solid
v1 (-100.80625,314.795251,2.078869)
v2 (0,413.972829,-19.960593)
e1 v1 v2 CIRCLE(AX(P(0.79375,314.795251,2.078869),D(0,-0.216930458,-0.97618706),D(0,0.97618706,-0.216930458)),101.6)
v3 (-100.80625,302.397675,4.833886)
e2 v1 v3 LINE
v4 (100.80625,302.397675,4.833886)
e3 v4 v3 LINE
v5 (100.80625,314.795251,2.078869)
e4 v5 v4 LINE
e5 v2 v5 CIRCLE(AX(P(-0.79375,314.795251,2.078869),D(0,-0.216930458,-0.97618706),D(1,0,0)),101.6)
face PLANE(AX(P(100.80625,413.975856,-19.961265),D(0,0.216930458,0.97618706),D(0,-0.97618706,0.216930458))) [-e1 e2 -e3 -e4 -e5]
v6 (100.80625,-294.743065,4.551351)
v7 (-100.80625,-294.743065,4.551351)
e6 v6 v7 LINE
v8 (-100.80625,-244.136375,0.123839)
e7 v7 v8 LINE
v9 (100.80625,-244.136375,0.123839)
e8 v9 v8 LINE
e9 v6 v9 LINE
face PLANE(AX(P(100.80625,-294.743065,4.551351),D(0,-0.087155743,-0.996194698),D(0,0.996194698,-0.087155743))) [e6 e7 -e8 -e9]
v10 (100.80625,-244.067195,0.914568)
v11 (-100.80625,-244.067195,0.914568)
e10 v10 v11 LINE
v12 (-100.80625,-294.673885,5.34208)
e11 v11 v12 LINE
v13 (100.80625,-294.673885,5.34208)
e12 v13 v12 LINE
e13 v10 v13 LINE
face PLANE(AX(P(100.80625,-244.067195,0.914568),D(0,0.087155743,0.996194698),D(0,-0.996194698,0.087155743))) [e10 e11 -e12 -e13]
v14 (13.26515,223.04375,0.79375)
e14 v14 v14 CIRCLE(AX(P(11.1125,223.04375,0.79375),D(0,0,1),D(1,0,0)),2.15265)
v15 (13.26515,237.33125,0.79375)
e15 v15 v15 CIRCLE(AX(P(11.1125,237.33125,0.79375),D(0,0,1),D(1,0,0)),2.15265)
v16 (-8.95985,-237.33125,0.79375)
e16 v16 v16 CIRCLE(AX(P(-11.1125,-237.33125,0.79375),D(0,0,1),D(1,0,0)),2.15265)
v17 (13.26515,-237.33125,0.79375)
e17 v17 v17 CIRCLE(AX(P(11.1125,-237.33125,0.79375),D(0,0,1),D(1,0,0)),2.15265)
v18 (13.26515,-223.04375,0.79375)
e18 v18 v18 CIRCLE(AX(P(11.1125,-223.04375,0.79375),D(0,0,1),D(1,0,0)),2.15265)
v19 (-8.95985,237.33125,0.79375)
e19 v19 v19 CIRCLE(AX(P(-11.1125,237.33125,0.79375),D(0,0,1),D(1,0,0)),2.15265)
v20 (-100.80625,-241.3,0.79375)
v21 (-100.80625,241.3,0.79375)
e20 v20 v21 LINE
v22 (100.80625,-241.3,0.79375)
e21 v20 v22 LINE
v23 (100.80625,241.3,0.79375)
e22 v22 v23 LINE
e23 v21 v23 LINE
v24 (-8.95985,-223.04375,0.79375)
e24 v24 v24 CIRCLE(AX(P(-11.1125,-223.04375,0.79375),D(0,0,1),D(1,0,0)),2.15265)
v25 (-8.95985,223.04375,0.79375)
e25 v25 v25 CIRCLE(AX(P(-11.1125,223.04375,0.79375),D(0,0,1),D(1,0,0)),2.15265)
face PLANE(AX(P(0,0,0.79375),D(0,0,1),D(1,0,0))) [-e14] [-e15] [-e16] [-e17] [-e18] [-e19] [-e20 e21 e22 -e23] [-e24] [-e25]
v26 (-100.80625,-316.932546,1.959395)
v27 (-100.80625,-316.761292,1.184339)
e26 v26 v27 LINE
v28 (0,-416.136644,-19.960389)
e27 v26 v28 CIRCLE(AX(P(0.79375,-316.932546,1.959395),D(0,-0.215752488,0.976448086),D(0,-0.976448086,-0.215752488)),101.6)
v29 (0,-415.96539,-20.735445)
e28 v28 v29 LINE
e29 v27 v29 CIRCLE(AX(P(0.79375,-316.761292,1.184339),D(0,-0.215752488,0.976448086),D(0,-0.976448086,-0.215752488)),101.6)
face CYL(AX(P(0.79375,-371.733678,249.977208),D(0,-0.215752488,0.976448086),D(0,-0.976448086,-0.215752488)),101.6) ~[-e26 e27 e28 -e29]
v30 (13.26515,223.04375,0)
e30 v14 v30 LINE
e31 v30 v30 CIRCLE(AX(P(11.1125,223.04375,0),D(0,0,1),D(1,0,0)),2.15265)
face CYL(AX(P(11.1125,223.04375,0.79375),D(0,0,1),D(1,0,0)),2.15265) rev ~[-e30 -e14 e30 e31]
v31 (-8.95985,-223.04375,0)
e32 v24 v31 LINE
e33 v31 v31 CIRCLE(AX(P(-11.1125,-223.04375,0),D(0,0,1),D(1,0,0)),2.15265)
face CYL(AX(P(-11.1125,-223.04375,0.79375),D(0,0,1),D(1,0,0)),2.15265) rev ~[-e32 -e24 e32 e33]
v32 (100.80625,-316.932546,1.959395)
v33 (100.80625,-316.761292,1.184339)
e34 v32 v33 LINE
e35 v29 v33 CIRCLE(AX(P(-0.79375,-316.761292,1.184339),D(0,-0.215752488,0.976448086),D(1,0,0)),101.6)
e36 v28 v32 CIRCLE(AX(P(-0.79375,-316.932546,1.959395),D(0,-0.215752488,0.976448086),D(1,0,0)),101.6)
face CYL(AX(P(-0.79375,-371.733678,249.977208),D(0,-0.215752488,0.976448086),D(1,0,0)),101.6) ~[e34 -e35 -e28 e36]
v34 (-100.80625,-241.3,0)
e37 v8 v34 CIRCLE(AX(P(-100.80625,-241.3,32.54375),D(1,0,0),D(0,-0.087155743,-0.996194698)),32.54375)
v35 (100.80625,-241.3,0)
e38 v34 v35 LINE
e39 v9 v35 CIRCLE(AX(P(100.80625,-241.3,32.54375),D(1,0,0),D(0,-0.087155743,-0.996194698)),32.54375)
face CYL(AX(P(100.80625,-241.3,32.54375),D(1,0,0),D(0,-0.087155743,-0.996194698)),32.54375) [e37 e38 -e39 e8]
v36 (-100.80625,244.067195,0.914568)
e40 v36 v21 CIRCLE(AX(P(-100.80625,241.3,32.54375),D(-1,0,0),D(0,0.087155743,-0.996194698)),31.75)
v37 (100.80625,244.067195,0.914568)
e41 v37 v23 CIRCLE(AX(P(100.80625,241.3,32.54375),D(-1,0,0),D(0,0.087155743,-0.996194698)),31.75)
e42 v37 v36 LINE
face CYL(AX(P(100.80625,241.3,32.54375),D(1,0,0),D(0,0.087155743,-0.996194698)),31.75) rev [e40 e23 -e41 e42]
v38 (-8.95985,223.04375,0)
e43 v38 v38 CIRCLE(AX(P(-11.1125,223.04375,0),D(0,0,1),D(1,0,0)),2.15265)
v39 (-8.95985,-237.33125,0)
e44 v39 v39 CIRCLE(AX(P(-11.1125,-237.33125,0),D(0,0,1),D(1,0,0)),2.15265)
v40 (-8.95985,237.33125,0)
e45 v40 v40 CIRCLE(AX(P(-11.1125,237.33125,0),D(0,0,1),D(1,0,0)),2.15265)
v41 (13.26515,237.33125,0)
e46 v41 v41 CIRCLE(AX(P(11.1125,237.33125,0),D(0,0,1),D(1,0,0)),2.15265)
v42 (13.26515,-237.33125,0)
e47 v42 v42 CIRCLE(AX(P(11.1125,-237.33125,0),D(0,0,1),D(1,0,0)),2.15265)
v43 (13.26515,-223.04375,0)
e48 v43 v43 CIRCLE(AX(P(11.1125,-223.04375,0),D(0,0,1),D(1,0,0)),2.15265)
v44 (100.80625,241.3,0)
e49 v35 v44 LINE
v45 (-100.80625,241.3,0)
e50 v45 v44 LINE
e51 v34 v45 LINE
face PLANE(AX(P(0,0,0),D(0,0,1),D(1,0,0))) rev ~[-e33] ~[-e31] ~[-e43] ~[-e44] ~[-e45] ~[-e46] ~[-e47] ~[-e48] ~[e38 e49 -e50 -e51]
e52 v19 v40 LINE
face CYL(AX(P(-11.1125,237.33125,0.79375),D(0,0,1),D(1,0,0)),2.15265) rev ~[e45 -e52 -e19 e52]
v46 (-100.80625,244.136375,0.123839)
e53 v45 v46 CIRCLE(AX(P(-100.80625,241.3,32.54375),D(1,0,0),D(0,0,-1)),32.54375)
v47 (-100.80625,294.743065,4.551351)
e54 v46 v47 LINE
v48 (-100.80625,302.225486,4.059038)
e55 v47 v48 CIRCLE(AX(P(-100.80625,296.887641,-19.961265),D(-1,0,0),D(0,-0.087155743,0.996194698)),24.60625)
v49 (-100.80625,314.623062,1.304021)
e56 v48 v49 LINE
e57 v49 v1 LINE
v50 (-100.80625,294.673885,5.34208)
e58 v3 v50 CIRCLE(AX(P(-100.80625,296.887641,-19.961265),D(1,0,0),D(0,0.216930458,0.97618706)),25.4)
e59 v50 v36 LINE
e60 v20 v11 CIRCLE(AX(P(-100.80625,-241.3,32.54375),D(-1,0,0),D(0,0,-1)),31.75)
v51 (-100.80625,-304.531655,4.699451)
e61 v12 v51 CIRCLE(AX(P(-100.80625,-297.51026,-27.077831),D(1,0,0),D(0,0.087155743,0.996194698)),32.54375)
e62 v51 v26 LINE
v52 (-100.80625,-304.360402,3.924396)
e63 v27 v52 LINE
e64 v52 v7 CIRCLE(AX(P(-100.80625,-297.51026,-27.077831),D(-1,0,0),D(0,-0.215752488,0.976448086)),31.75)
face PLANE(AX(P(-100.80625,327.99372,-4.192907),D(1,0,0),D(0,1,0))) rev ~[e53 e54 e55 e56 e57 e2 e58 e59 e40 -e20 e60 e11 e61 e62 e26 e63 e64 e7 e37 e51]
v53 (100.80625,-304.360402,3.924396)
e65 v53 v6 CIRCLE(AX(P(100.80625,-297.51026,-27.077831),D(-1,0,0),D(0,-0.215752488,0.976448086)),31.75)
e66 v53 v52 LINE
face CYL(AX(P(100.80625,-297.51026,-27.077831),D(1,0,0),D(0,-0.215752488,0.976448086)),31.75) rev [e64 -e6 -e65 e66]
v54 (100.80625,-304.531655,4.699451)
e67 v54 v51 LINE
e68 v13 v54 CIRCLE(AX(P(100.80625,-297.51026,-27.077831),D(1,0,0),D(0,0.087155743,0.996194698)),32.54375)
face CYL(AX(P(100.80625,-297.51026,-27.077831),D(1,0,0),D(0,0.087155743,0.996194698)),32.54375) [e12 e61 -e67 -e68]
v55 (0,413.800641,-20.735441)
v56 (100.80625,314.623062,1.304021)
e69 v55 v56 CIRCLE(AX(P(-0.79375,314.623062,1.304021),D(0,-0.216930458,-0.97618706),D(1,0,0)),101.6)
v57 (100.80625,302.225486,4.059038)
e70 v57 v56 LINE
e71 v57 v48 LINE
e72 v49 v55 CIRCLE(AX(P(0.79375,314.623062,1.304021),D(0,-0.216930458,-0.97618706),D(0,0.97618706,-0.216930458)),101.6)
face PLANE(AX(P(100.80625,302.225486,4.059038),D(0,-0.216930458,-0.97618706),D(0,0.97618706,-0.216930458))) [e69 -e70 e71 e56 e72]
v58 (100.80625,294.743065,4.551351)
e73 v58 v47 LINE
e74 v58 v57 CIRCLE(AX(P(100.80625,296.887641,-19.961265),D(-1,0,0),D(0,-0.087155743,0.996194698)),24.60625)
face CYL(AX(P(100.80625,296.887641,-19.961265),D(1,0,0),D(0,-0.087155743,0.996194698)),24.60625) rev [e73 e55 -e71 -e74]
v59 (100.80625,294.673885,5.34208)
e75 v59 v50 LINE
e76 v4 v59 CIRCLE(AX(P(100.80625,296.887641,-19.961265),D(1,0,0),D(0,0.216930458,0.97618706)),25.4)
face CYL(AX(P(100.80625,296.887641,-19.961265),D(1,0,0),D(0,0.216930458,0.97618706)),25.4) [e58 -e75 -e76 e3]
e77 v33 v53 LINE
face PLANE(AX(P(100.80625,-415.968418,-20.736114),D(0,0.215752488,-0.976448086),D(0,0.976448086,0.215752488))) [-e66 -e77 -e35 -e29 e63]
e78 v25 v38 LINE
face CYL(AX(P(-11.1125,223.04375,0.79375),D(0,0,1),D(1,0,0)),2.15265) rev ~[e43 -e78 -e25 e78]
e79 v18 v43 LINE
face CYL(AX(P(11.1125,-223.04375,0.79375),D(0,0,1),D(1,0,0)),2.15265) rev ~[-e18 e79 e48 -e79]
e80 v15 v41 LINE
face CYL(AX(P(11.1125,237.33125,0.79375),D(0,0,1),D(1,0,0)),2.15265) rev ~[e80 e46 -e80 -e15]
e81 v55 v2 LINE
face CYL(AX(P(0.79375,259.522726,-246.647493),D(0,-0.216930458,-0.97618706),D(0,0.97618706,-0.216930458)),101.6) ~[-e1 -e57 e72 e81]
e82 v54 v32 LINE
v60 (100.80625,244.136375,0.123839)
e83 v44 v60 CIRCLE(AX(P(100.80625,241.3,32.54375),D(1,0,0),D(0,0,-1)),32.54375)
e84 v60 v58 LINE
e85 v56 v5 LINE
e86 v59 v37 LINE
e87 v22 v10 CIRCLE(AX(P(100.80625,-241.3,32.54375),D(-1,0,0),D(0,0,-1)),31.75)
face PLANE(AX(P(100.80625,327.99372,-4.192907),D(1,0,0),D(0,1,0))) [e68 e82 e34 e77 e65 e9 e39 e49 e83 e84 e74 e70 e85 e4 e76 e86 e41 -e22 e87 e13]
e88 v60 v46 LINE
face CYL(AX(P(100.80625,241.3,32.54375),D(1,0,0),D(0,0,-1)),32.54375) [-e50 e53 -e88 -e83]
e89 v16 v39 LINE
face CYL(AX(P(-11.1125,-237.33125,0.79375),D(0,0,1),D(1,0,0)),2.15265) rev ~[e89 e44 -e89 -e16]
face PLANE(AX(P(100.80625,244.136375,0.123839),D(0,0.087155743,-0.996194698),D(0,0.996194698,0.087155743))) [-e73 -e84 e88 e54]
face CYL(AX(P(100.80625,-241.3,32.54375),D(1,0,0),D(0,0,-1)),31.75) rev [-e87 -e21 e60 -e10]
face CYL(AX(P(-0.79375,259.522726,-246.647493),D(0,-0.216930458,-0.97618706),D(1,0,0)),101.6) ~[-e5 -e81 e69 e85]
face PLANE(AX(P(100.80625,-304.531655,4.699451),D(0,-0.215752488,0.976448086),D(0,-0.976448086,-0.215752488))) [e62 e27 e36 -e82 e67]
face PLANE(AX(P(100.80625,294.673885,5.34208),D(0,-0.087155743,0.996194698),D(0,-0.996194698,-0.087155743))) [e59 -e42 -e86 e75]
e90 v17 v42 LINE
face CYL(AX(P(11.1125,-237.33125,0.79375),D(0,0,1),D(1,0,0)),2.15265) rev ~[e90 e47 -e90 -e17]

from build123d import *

# Parameters (mm, degrees)
F0_W        = 201.6125
F0_H        = 482.6
F1_DEPTH    = 0.79375
F3_DEPTH    = 201.6125
F4_T1_DEPTH = 508.79375
F4_T3_DEPTH = 508.79375
F5_R        = 2.15265
F6_DEPTH    = 0.79375


# Not quite as in the source:
# - a fillet or chamfer that OpenCascade refuses, or shapes differently, is made with other operations: its cross-section is extruded or revolved along the edge and cut away or added


with BuildPart() as f1:
    # F0 (on Top) → F1 (new body)
    with BuildSketch(Plane.XY):
        Rectangle(F0_W, F0_H)
    extrude(amount=F1_DEPTH)

    # F2 (on face) → F3 (join, through all)
    with BuildSketch(Plane.YZ.offset(100.80625)):
        with BuildLine():
            ThreePointArc((244.0671948322, 0.9145683356), (242.6849155488, 0.8239689648), (241.3, 0.79375))
            Line((241.3, 0.79375), (241.3, 0))
            ThreePointArc((241.3, 0), (242.7195384376, 0.0309744389), (244.136374703, 0.123838794))
            Line((244.136374703, 0.123838794), (294.7430653661, 4.5513505256))
            ThreePointArc((294.7430653661, 4.5513505256), (298.5031396949, 4.5918955138), (302.2254864388, 4.0590375853))
            Line((302.2254864388, 4.0590375853), (413.8036674178, -20.7361137434))
            Line((413.8036674178, -20.7361137434), (413.9758559687, -19.9612652644))
            Line((413.9758559687, -19.9612652644), (302.3976749897, 4.8338860643))
            ThreePointArc((302.3976749897, 4.8338860643), (298.5552525443, 5.3839329582), (294.6738854953, 5.3420800672))
            Line((294.6738854953, 5.3420800672), (244.0671948322, 0.9145683356))
        make_face()
        with BuildLine():
            Line((-241.3, 0), (-241.3, 0.79375))
            ThreePointArc((-241.3, 0.79375), (-242.6849155488, 0.8239689648), (-244.0671948322, 0.9145683356))
            Line((-244.0671948322, 0.9145683356), (-294.6738854953, 5.3420800672))
            ThreePointArc((-294.6738854953, 5.3420800672), (-299.6272962644, 5.3969871417), (-304.5316552149, 4.699451251))
            Line((-304.5316552149, 4.699451251), (-416.1396714134, -19.9610580753))
            Line((-416.1396714134, -19.9610580753), (-415.9684178764, -20.7361137434))
            Line((-415.9684178764, -20.7361137434), (-304.3604016779, 3.924395583))
            ThreePointArc((-304.3604016779, 3.924395583), (-299.5756612384, 4.6049184032), (-294.7430653661, 4.5513505256))
            Line((-294.7430653661, 4.5513505256), (-244.136374703, 0.123838794))
            ThreePointArc((-244.136374703, 0.123838794), (-242.7195384376, 0.0309744389), (-241.3, 0))
        make_face()
    extrude(amount=-F3_DEPTH)

    # F4: fillet of radius 101.6 on 4 edges, made by hand

    # F4_s2 → F4_t1 (cut)
    with BuildSketch(Plane(origin=(0, -40.0183995531, -180.082797989), x_dir=(1, 0, 0), z_dir=(0, 0.2169304578, 0.9761870602))):
        with BuildLine():
            ThreePointArc((100.80625, 306.8480802377), (71.0482989686, 378.6901292062), (-0.79375, 408.4480802377))
            Line((-0.79375, 408.4480802377), (100.80625, 408.4480802377))
            Line((100.80625, 408.4480802377), (100.80625, 306.8480802377))
        make_face()
        with BuildLine():
            ThreePointArc((0.79375, 408.4480802377), (-71.0482989686, 378.6901292062), (-100.80625, 306.8480802377))
            Line((-100.80625, 306.8480802377), (-100.80625, 408.4480802377))
            Line((-100.80625, 408.4480802377), (0.79375, 408.4480802377))
        make_face()
    extrude(amount=F4_T1_DEPTH, mode=Mode.SUBTRACT)

    # F4_s4 → F4_t3 (cut)
    with BuildSketch(Plane(origin=(0, -69.9668558158, 316.6545294712), x_dir=(1, 0, 0), z_dir=(0, 0.2157524875, -0.9764480857))):
        with BuildLine():
            ThreePointArc((100.80625, 309.0454334801), (71.0482989686, 380.8874824486), (-0.79375, 410.6454334801))
            Line((-0.79375, 410.6454334801), (100.80625, 410.6454334801))
            Line((100.80625, 410.6454334801), (100.80625, 309.0454334801))
        make_face()
        with BuildLine():
            ThreePointArc((0.79375, 410.6454334801), (-71.0482989686, 380.8874824486), (-100.80625, 309.0454334801))
            Line((-100.80625, 309.0454334801), (-100.80625, 410.6454334801))
            Line((-100.80625, 410.6454334801), (0.79375, 410.6454334801))
        make_face()
    extrude(amount=F4_T3_DEPTH, mode=Mode.SUBTRACT)

    # F5 (on face) → F6 (cut, through all)
    with BuildSketch(Plane.XY.offset(0.79375)):
        with Locations((-11.1125, 237.33125)):
            Circle(F5_R)
        with Locations((11.1125, 237.33125)):
            Circle(F5_R)
        with Locations((11.1125, 223.04375)):
            Circle(F5_R)
        with Locations((-11.1125, 223.04375)):
            Circle(F5_R)
        with Locations((11.1125, -223.04375)):
            Circle(F5_R)
        with Locations((-11.1125, -223.04375)):
            Circle(F5_R)
        with Locations((-11.1125, -237.33125)):
            Circle(F5_R)
        with Locations((11.1125, -237.33125)):
            Circle(F5_R)
    extrude(amount=-F6_DEPTH, mode=Mode.SUBTRACT)


solid = f1.part
